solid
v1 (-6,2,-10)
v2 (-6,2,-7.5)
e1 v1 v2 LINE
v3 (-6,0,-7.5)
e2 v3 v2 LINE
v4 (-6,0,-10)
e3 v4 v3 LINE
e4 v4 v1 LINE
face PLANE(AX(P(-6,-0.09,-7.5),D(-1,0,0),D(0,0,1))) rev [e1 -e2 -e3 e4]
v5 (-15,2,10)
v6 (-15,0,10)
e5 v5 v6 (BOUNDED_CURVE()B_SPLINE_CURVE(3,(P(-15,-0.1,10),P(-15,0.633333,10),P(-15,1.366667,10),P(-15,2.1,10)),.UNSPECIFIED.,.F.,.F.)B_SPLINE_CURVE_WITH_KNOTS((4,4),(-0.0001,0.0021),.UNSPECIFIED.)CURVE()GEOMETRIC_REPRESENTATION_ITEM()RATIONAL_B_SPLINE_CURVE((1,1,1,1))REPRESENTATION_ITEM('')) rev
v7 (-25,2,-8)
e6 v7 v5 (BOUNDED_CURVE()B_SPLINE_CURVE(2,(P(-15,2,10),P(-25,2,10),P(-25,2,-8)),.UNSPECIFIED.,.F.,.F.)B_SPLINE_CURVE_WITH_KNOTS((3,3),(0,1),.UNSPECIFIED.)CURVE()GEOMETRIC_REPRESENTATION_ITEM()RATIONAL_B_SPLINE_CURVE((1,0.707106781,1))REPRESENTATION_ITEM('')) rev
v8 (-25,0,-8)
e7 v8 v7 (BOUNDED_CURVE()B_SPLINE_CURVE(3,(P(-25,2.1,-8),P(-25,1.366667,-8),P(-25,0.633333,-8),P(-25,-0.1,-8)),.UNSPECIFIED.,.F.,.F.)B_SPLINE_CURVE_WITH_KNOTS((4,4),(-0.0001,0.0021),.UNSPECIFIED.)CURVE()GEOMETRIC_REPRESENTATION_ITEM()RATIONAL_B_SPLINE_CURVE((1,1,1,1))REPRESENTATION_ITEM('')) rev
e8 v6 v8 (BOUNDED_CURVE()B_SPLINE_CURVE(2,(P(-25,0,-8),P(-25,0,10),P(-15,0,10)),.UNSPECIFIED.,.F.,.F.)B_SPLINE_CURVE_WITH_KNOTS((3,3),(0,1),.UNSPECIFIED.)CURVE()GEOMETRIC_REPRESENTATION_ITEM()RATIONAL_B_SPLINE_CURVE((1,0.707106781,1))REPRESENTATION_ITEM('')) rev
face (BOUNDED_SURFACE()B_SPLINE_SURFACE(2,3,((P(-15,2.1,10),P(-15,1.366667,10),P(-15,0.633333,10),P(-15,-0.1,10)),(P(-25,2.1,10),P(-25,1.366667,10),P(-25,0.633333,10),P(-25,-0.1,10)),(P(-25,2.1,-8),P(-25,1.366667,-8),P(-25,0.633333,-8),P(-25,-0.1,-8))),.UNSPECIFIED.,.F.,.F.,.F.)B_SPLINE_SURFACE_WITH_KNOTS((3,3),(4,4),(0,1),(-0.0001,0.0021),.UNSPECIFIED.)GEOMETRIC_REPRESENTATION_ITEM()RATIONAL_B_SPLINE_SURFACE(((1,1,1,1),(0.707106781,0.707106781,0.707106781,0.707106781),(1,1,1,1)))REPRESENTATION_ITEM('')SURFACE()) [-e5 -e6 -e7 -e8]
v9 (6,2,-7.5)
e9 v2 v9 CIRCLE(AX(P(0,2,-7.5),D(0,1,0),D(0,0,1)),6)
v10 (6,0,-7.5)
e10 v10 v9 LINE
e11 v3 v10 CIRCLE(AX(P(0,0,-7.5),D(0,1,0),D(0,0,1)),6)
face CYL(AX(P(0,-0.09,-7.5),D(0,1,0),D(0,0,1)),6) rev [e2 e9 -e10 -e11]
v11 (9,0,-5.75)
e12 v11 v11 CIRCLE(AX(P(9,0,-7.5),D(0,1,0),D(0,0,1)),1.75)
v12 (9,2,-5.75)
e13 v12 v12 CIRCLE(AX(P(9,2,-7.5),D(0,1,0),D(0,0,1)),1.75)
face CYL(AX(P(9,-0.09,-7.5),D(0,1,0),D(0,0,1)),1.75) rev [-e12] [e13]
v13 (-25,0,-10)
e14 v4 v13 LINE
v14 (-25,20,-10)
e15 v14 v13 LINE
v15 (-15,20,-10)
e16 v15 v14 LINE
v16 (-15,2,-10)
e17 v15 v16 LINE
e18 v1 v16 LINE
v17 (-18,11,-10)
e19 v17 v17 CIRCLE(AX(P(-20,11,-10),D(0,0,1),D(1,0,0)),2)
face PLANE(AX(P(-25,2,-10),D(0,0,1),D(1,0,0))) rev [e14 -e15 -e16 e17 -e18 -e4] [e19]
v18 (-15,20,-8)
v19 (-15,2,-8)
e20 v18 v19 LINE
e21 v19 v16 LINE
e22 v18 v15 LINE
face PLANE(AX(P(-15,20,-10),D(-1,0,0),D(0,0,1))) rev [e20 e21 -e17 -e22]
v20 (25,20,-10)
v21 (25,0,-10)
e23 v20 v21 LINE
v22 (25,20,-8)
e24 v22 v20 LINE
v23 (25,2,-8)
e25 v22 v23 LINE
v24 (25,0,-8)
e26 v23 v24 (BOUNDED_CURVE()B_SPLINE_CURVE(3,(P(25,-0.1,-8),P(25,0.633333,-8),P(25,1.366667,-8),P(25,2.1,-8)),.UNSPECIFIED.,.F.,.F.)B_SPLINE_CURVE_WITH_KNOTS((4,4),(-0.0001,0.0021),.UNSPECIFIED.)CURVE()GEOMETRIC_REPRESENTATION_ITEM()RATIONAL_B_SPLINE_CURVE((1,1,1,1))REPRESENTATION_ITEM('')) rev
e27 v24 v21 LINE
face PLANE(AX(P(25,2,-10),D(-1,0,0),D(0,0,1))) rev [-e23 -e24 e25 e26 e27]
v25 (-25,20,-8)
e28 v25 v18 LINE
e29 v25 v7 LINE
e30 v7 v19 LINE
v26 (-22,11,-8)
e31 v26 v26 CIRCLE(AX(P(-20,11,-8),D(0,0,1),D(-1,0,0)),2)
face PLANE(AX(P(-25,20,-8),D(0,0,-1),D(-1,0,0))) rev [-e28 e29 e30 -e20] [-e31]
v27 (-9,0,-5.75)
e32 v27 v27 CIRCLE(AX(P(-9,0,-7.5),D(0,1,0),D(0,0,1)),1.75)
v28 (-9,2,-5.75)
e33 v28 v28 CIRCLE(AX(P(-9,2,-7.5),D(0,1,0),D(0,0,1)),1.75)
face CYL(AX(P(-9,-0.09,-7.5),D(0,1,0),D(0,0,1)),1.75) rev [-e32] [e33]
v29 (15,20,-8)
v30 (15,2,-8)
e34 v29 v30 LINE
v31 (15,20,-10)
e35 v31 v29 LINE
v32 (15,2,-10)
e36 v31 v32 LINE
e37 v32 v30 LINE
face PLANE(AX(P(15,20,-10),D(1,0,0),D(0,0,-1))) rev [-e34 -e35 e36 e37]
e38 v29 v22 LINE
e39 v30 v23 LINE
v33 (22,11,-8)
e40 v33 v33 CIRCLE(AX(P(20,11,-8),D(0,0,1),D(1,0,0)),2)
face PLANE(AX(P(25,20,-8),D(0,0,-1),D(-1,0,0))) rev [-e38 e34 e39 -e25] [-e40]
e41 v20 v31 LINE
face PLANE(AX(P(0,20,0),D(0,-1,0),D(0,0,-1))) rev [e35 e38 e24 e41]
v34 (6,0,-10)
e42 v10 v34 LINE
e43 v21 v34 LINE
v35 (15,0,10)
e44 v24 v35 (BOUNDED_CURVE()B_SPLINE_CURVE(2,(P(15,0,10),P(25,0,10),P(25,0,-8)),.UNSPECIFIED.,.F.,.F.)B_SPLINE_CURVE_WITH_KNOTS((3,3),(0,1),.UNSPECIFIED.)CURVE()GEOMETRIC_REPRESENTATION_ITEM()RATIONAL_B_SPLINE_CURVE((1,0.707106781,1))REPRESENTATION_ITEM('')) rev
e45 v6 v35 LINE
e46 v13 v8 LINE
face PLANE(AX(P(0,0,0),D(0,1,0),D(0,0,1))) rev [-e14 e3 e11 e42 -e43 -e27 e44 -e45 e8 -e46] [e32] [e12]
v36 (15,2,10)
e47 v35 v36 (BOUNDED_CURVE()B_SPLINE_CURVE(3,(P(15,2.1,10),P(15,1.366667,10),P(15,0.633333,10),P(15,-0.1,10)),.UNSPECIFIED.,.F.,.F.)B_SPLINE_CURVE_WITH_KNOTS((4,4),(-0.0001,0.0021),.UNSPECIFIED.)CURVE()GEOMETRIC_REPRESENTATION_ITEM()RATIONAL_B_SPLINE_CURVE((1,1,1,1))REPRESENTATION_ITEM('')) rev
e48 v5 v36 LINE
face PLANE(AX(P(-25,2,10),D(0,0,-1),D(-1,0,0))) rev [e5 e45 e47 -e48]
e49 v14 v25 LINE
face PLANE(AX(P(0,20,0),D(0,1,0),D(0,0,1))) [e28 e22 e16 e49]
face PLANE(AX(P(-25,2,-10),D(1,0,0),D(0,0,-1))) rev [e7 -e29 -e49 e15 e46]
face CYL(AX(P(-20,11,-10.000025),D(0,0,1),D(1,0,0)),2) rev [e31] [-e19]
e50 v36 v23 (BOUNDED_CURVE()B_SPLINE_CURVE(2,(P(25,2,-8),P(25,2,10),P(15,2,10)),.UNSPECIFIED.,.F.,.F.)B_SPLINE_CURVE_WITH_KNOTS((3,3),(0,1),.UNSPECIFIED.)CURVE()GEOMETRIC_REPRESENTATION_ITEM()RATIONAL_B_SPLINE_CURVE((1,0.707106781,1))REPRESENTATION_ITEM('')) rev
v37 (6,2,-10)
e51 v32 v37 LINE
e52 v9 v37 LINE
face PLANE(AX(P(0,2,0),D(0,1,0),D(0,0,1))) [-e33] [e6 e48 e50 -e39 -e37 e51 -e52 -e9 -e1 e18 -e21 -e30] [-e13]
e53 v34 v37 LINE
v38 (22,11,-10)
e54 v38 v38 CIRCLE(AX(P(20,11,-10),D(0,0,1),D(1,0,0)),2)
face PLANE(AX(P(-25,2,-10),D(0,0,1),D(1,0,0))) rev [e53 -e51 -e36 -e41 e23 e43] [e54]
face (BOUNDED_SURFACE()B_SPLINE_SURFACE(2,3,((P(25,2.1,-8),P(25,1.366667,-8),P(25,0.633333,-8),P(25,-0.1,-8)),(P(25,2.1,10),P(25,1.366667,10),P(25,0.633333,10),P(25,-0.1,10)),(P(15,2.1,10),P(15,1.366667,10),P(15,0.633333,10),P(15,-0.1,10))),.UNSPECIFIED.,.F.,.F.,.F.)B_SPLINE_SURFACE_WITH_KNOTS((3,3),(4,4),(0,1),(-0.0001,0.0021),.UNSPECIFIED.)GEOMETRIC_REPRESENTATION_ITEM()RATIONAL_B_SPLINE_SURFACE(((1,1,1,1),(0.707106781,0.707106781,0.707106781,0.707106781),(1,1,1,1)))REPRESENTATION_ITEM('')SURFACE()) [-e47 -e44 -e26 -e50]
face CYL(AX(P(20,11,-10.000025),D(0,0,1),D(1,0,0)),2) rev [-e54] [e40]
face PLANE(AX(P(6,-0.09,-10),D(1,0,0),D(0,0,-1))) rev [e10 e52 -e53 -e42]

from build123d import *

# Parameters (mm, degrees)
SKETCH1_W           = 50
SKETCH1_H           = 20
BOSS_EXTRUDE1_DEPTH = 2
SKETCH2_W           = 10
SKETCH2_H           = 2
BOSS_EXTRUDE2_DEPTH = 18
FILLET1_SIZE        = 10
FILLET1_SIZE_2      = 18
FILLET2_SIZE        = 18
FILLET2_SIZE_2      = 10
CUT_EXTRUDE1_DEPTH  = 33.388269589
SKETCH5_R           = 1.75
CUT_EXTRUDE2_DEPTH  = 33.388269589
SKETCH6_R           = 2
CUT_EXTRUDE3_DEPTH  = 37.728735461


with BuildPart() as part:
    # Sketch1 → Boss-Extrude1 (new body)
    with BuildSketch(Plane(origin=(0, 0, 0), x_dir=(1, 0, 0), z_dir=(0, 1, 0))):
        Rectangle(SKETCH1_W, SKETCH1_H)
    extrude(amount=BOSS_EXTRUDE1_DEPTH)

    # Sketch2 → Boss-Extrude2 (add)
    with BuildSketch(Plane(origin=(0, 2, 0), x_dir=(1, 0, 0), z_dir=(0, 1, 0))):
        with Locations((-20, 9)):
            Rectangle(SKETCH2_W, SKETCH2_H)
        with Locations((20, 9)):
            Rectangle(SKETCH2_W, SKETCH2_H)
    extrude(amount=BOSS_EXTRUDE2_DEPTH)

    # Fillet1
    # an asymmetric fillet: 18, 10 mm, written as the material it takes off along each edge
    with BuildSketch(Plane(origin=(-25, -45, 10), x_dir=(1, 0, 0), z_dir=(0, 1, 0))) as fillet1_piece_1:
        with BuildLine():
            Bezier((FILLET1_SIZE, 0), (0, 0), (0, FILLET1_SIZE_2), weights=[1, 0.707106781, 1])
            Line((0, FILLET1_SIZE_2), (0, 0))
            Line((0, 0), (FILLET1_SIZE, 0))
        make_face()
    extrude(amount=92, mode=Mode.SUBTRACT)

    # Fillet2
    # an asymmetric fillet: 18, 10 mm, written as the material it takes off along each edge
    with BuildSketch(Plane(origin=(25, -45, 10), x_dir=(0, 0, -1), z_dir=(0, 1, 0))) as fillet2_piece_1:
        with BuildLine():
            Bezier((FILLET2_SIZE, 0), (0, 0), (0, FILLET2_SIZE_2), weights=[1, 0.707106781, 1])
            Line((0, FILLET2_SIZE_2), (0, 0))
            Line((0, 0), (FILLET2_SIZE, 0))
        make_face()
    extrude(amount=92, mode=Mode.SUBTRACT)

    # Sketch4 → Cut-Extrude1 (cut, through all)
    with BuildSketch(Plane(origin=(0, 2, 0), x_dir=(1, 0, 0), z_dir=(0, 1, 0))):
        with BuildLine():
            Line((-6, 7.5), (-6, 10))
            Line((-6, 10), (6, 10))
            Line((6, 10), (6, 7.5))
            ThreePointArc((6, 7.5), (0, 1.5), (-6, 7.5))
        make_face()
    extrude(amount=-CUT_EXTRUDE1_DEPTH, mode=Mode.SUBTRACT)

    # Sketch5 → Cut-Extrude2 (cut, through all)
    with BuildSketch(Plane(origin=(0, 2, 0), x_dir=(1, 0, 0), z_dir=(0, 1, 0))):
        with Locations(Location((-9, 7.5, 0), (0, 0, 270))):
            Circle(SKETCH5_R)
        with Locations(Location((9, 7.5, 0), (0, 0, 270))):
            Circle(SKETCH5_R)
    extrude(amount=-CUT_EXTRUDE2_DEPTH, mode=Mode.SUBTRACT)

    # Sketch6 → Cut-Extrude3 (cut, through all)
    with BuildSketch(Plane.XY.offset(-8)):
        with Locations((20, 11)):
            Circle(SKETCH6_R)
        with Locations((-20, 11)):
            Circle(SKETCH6_R)
    extrude(amount=-CUT_EXTRUDE3_DEPTH, mode=Mode.SUBTRACT)


solid = part.part
